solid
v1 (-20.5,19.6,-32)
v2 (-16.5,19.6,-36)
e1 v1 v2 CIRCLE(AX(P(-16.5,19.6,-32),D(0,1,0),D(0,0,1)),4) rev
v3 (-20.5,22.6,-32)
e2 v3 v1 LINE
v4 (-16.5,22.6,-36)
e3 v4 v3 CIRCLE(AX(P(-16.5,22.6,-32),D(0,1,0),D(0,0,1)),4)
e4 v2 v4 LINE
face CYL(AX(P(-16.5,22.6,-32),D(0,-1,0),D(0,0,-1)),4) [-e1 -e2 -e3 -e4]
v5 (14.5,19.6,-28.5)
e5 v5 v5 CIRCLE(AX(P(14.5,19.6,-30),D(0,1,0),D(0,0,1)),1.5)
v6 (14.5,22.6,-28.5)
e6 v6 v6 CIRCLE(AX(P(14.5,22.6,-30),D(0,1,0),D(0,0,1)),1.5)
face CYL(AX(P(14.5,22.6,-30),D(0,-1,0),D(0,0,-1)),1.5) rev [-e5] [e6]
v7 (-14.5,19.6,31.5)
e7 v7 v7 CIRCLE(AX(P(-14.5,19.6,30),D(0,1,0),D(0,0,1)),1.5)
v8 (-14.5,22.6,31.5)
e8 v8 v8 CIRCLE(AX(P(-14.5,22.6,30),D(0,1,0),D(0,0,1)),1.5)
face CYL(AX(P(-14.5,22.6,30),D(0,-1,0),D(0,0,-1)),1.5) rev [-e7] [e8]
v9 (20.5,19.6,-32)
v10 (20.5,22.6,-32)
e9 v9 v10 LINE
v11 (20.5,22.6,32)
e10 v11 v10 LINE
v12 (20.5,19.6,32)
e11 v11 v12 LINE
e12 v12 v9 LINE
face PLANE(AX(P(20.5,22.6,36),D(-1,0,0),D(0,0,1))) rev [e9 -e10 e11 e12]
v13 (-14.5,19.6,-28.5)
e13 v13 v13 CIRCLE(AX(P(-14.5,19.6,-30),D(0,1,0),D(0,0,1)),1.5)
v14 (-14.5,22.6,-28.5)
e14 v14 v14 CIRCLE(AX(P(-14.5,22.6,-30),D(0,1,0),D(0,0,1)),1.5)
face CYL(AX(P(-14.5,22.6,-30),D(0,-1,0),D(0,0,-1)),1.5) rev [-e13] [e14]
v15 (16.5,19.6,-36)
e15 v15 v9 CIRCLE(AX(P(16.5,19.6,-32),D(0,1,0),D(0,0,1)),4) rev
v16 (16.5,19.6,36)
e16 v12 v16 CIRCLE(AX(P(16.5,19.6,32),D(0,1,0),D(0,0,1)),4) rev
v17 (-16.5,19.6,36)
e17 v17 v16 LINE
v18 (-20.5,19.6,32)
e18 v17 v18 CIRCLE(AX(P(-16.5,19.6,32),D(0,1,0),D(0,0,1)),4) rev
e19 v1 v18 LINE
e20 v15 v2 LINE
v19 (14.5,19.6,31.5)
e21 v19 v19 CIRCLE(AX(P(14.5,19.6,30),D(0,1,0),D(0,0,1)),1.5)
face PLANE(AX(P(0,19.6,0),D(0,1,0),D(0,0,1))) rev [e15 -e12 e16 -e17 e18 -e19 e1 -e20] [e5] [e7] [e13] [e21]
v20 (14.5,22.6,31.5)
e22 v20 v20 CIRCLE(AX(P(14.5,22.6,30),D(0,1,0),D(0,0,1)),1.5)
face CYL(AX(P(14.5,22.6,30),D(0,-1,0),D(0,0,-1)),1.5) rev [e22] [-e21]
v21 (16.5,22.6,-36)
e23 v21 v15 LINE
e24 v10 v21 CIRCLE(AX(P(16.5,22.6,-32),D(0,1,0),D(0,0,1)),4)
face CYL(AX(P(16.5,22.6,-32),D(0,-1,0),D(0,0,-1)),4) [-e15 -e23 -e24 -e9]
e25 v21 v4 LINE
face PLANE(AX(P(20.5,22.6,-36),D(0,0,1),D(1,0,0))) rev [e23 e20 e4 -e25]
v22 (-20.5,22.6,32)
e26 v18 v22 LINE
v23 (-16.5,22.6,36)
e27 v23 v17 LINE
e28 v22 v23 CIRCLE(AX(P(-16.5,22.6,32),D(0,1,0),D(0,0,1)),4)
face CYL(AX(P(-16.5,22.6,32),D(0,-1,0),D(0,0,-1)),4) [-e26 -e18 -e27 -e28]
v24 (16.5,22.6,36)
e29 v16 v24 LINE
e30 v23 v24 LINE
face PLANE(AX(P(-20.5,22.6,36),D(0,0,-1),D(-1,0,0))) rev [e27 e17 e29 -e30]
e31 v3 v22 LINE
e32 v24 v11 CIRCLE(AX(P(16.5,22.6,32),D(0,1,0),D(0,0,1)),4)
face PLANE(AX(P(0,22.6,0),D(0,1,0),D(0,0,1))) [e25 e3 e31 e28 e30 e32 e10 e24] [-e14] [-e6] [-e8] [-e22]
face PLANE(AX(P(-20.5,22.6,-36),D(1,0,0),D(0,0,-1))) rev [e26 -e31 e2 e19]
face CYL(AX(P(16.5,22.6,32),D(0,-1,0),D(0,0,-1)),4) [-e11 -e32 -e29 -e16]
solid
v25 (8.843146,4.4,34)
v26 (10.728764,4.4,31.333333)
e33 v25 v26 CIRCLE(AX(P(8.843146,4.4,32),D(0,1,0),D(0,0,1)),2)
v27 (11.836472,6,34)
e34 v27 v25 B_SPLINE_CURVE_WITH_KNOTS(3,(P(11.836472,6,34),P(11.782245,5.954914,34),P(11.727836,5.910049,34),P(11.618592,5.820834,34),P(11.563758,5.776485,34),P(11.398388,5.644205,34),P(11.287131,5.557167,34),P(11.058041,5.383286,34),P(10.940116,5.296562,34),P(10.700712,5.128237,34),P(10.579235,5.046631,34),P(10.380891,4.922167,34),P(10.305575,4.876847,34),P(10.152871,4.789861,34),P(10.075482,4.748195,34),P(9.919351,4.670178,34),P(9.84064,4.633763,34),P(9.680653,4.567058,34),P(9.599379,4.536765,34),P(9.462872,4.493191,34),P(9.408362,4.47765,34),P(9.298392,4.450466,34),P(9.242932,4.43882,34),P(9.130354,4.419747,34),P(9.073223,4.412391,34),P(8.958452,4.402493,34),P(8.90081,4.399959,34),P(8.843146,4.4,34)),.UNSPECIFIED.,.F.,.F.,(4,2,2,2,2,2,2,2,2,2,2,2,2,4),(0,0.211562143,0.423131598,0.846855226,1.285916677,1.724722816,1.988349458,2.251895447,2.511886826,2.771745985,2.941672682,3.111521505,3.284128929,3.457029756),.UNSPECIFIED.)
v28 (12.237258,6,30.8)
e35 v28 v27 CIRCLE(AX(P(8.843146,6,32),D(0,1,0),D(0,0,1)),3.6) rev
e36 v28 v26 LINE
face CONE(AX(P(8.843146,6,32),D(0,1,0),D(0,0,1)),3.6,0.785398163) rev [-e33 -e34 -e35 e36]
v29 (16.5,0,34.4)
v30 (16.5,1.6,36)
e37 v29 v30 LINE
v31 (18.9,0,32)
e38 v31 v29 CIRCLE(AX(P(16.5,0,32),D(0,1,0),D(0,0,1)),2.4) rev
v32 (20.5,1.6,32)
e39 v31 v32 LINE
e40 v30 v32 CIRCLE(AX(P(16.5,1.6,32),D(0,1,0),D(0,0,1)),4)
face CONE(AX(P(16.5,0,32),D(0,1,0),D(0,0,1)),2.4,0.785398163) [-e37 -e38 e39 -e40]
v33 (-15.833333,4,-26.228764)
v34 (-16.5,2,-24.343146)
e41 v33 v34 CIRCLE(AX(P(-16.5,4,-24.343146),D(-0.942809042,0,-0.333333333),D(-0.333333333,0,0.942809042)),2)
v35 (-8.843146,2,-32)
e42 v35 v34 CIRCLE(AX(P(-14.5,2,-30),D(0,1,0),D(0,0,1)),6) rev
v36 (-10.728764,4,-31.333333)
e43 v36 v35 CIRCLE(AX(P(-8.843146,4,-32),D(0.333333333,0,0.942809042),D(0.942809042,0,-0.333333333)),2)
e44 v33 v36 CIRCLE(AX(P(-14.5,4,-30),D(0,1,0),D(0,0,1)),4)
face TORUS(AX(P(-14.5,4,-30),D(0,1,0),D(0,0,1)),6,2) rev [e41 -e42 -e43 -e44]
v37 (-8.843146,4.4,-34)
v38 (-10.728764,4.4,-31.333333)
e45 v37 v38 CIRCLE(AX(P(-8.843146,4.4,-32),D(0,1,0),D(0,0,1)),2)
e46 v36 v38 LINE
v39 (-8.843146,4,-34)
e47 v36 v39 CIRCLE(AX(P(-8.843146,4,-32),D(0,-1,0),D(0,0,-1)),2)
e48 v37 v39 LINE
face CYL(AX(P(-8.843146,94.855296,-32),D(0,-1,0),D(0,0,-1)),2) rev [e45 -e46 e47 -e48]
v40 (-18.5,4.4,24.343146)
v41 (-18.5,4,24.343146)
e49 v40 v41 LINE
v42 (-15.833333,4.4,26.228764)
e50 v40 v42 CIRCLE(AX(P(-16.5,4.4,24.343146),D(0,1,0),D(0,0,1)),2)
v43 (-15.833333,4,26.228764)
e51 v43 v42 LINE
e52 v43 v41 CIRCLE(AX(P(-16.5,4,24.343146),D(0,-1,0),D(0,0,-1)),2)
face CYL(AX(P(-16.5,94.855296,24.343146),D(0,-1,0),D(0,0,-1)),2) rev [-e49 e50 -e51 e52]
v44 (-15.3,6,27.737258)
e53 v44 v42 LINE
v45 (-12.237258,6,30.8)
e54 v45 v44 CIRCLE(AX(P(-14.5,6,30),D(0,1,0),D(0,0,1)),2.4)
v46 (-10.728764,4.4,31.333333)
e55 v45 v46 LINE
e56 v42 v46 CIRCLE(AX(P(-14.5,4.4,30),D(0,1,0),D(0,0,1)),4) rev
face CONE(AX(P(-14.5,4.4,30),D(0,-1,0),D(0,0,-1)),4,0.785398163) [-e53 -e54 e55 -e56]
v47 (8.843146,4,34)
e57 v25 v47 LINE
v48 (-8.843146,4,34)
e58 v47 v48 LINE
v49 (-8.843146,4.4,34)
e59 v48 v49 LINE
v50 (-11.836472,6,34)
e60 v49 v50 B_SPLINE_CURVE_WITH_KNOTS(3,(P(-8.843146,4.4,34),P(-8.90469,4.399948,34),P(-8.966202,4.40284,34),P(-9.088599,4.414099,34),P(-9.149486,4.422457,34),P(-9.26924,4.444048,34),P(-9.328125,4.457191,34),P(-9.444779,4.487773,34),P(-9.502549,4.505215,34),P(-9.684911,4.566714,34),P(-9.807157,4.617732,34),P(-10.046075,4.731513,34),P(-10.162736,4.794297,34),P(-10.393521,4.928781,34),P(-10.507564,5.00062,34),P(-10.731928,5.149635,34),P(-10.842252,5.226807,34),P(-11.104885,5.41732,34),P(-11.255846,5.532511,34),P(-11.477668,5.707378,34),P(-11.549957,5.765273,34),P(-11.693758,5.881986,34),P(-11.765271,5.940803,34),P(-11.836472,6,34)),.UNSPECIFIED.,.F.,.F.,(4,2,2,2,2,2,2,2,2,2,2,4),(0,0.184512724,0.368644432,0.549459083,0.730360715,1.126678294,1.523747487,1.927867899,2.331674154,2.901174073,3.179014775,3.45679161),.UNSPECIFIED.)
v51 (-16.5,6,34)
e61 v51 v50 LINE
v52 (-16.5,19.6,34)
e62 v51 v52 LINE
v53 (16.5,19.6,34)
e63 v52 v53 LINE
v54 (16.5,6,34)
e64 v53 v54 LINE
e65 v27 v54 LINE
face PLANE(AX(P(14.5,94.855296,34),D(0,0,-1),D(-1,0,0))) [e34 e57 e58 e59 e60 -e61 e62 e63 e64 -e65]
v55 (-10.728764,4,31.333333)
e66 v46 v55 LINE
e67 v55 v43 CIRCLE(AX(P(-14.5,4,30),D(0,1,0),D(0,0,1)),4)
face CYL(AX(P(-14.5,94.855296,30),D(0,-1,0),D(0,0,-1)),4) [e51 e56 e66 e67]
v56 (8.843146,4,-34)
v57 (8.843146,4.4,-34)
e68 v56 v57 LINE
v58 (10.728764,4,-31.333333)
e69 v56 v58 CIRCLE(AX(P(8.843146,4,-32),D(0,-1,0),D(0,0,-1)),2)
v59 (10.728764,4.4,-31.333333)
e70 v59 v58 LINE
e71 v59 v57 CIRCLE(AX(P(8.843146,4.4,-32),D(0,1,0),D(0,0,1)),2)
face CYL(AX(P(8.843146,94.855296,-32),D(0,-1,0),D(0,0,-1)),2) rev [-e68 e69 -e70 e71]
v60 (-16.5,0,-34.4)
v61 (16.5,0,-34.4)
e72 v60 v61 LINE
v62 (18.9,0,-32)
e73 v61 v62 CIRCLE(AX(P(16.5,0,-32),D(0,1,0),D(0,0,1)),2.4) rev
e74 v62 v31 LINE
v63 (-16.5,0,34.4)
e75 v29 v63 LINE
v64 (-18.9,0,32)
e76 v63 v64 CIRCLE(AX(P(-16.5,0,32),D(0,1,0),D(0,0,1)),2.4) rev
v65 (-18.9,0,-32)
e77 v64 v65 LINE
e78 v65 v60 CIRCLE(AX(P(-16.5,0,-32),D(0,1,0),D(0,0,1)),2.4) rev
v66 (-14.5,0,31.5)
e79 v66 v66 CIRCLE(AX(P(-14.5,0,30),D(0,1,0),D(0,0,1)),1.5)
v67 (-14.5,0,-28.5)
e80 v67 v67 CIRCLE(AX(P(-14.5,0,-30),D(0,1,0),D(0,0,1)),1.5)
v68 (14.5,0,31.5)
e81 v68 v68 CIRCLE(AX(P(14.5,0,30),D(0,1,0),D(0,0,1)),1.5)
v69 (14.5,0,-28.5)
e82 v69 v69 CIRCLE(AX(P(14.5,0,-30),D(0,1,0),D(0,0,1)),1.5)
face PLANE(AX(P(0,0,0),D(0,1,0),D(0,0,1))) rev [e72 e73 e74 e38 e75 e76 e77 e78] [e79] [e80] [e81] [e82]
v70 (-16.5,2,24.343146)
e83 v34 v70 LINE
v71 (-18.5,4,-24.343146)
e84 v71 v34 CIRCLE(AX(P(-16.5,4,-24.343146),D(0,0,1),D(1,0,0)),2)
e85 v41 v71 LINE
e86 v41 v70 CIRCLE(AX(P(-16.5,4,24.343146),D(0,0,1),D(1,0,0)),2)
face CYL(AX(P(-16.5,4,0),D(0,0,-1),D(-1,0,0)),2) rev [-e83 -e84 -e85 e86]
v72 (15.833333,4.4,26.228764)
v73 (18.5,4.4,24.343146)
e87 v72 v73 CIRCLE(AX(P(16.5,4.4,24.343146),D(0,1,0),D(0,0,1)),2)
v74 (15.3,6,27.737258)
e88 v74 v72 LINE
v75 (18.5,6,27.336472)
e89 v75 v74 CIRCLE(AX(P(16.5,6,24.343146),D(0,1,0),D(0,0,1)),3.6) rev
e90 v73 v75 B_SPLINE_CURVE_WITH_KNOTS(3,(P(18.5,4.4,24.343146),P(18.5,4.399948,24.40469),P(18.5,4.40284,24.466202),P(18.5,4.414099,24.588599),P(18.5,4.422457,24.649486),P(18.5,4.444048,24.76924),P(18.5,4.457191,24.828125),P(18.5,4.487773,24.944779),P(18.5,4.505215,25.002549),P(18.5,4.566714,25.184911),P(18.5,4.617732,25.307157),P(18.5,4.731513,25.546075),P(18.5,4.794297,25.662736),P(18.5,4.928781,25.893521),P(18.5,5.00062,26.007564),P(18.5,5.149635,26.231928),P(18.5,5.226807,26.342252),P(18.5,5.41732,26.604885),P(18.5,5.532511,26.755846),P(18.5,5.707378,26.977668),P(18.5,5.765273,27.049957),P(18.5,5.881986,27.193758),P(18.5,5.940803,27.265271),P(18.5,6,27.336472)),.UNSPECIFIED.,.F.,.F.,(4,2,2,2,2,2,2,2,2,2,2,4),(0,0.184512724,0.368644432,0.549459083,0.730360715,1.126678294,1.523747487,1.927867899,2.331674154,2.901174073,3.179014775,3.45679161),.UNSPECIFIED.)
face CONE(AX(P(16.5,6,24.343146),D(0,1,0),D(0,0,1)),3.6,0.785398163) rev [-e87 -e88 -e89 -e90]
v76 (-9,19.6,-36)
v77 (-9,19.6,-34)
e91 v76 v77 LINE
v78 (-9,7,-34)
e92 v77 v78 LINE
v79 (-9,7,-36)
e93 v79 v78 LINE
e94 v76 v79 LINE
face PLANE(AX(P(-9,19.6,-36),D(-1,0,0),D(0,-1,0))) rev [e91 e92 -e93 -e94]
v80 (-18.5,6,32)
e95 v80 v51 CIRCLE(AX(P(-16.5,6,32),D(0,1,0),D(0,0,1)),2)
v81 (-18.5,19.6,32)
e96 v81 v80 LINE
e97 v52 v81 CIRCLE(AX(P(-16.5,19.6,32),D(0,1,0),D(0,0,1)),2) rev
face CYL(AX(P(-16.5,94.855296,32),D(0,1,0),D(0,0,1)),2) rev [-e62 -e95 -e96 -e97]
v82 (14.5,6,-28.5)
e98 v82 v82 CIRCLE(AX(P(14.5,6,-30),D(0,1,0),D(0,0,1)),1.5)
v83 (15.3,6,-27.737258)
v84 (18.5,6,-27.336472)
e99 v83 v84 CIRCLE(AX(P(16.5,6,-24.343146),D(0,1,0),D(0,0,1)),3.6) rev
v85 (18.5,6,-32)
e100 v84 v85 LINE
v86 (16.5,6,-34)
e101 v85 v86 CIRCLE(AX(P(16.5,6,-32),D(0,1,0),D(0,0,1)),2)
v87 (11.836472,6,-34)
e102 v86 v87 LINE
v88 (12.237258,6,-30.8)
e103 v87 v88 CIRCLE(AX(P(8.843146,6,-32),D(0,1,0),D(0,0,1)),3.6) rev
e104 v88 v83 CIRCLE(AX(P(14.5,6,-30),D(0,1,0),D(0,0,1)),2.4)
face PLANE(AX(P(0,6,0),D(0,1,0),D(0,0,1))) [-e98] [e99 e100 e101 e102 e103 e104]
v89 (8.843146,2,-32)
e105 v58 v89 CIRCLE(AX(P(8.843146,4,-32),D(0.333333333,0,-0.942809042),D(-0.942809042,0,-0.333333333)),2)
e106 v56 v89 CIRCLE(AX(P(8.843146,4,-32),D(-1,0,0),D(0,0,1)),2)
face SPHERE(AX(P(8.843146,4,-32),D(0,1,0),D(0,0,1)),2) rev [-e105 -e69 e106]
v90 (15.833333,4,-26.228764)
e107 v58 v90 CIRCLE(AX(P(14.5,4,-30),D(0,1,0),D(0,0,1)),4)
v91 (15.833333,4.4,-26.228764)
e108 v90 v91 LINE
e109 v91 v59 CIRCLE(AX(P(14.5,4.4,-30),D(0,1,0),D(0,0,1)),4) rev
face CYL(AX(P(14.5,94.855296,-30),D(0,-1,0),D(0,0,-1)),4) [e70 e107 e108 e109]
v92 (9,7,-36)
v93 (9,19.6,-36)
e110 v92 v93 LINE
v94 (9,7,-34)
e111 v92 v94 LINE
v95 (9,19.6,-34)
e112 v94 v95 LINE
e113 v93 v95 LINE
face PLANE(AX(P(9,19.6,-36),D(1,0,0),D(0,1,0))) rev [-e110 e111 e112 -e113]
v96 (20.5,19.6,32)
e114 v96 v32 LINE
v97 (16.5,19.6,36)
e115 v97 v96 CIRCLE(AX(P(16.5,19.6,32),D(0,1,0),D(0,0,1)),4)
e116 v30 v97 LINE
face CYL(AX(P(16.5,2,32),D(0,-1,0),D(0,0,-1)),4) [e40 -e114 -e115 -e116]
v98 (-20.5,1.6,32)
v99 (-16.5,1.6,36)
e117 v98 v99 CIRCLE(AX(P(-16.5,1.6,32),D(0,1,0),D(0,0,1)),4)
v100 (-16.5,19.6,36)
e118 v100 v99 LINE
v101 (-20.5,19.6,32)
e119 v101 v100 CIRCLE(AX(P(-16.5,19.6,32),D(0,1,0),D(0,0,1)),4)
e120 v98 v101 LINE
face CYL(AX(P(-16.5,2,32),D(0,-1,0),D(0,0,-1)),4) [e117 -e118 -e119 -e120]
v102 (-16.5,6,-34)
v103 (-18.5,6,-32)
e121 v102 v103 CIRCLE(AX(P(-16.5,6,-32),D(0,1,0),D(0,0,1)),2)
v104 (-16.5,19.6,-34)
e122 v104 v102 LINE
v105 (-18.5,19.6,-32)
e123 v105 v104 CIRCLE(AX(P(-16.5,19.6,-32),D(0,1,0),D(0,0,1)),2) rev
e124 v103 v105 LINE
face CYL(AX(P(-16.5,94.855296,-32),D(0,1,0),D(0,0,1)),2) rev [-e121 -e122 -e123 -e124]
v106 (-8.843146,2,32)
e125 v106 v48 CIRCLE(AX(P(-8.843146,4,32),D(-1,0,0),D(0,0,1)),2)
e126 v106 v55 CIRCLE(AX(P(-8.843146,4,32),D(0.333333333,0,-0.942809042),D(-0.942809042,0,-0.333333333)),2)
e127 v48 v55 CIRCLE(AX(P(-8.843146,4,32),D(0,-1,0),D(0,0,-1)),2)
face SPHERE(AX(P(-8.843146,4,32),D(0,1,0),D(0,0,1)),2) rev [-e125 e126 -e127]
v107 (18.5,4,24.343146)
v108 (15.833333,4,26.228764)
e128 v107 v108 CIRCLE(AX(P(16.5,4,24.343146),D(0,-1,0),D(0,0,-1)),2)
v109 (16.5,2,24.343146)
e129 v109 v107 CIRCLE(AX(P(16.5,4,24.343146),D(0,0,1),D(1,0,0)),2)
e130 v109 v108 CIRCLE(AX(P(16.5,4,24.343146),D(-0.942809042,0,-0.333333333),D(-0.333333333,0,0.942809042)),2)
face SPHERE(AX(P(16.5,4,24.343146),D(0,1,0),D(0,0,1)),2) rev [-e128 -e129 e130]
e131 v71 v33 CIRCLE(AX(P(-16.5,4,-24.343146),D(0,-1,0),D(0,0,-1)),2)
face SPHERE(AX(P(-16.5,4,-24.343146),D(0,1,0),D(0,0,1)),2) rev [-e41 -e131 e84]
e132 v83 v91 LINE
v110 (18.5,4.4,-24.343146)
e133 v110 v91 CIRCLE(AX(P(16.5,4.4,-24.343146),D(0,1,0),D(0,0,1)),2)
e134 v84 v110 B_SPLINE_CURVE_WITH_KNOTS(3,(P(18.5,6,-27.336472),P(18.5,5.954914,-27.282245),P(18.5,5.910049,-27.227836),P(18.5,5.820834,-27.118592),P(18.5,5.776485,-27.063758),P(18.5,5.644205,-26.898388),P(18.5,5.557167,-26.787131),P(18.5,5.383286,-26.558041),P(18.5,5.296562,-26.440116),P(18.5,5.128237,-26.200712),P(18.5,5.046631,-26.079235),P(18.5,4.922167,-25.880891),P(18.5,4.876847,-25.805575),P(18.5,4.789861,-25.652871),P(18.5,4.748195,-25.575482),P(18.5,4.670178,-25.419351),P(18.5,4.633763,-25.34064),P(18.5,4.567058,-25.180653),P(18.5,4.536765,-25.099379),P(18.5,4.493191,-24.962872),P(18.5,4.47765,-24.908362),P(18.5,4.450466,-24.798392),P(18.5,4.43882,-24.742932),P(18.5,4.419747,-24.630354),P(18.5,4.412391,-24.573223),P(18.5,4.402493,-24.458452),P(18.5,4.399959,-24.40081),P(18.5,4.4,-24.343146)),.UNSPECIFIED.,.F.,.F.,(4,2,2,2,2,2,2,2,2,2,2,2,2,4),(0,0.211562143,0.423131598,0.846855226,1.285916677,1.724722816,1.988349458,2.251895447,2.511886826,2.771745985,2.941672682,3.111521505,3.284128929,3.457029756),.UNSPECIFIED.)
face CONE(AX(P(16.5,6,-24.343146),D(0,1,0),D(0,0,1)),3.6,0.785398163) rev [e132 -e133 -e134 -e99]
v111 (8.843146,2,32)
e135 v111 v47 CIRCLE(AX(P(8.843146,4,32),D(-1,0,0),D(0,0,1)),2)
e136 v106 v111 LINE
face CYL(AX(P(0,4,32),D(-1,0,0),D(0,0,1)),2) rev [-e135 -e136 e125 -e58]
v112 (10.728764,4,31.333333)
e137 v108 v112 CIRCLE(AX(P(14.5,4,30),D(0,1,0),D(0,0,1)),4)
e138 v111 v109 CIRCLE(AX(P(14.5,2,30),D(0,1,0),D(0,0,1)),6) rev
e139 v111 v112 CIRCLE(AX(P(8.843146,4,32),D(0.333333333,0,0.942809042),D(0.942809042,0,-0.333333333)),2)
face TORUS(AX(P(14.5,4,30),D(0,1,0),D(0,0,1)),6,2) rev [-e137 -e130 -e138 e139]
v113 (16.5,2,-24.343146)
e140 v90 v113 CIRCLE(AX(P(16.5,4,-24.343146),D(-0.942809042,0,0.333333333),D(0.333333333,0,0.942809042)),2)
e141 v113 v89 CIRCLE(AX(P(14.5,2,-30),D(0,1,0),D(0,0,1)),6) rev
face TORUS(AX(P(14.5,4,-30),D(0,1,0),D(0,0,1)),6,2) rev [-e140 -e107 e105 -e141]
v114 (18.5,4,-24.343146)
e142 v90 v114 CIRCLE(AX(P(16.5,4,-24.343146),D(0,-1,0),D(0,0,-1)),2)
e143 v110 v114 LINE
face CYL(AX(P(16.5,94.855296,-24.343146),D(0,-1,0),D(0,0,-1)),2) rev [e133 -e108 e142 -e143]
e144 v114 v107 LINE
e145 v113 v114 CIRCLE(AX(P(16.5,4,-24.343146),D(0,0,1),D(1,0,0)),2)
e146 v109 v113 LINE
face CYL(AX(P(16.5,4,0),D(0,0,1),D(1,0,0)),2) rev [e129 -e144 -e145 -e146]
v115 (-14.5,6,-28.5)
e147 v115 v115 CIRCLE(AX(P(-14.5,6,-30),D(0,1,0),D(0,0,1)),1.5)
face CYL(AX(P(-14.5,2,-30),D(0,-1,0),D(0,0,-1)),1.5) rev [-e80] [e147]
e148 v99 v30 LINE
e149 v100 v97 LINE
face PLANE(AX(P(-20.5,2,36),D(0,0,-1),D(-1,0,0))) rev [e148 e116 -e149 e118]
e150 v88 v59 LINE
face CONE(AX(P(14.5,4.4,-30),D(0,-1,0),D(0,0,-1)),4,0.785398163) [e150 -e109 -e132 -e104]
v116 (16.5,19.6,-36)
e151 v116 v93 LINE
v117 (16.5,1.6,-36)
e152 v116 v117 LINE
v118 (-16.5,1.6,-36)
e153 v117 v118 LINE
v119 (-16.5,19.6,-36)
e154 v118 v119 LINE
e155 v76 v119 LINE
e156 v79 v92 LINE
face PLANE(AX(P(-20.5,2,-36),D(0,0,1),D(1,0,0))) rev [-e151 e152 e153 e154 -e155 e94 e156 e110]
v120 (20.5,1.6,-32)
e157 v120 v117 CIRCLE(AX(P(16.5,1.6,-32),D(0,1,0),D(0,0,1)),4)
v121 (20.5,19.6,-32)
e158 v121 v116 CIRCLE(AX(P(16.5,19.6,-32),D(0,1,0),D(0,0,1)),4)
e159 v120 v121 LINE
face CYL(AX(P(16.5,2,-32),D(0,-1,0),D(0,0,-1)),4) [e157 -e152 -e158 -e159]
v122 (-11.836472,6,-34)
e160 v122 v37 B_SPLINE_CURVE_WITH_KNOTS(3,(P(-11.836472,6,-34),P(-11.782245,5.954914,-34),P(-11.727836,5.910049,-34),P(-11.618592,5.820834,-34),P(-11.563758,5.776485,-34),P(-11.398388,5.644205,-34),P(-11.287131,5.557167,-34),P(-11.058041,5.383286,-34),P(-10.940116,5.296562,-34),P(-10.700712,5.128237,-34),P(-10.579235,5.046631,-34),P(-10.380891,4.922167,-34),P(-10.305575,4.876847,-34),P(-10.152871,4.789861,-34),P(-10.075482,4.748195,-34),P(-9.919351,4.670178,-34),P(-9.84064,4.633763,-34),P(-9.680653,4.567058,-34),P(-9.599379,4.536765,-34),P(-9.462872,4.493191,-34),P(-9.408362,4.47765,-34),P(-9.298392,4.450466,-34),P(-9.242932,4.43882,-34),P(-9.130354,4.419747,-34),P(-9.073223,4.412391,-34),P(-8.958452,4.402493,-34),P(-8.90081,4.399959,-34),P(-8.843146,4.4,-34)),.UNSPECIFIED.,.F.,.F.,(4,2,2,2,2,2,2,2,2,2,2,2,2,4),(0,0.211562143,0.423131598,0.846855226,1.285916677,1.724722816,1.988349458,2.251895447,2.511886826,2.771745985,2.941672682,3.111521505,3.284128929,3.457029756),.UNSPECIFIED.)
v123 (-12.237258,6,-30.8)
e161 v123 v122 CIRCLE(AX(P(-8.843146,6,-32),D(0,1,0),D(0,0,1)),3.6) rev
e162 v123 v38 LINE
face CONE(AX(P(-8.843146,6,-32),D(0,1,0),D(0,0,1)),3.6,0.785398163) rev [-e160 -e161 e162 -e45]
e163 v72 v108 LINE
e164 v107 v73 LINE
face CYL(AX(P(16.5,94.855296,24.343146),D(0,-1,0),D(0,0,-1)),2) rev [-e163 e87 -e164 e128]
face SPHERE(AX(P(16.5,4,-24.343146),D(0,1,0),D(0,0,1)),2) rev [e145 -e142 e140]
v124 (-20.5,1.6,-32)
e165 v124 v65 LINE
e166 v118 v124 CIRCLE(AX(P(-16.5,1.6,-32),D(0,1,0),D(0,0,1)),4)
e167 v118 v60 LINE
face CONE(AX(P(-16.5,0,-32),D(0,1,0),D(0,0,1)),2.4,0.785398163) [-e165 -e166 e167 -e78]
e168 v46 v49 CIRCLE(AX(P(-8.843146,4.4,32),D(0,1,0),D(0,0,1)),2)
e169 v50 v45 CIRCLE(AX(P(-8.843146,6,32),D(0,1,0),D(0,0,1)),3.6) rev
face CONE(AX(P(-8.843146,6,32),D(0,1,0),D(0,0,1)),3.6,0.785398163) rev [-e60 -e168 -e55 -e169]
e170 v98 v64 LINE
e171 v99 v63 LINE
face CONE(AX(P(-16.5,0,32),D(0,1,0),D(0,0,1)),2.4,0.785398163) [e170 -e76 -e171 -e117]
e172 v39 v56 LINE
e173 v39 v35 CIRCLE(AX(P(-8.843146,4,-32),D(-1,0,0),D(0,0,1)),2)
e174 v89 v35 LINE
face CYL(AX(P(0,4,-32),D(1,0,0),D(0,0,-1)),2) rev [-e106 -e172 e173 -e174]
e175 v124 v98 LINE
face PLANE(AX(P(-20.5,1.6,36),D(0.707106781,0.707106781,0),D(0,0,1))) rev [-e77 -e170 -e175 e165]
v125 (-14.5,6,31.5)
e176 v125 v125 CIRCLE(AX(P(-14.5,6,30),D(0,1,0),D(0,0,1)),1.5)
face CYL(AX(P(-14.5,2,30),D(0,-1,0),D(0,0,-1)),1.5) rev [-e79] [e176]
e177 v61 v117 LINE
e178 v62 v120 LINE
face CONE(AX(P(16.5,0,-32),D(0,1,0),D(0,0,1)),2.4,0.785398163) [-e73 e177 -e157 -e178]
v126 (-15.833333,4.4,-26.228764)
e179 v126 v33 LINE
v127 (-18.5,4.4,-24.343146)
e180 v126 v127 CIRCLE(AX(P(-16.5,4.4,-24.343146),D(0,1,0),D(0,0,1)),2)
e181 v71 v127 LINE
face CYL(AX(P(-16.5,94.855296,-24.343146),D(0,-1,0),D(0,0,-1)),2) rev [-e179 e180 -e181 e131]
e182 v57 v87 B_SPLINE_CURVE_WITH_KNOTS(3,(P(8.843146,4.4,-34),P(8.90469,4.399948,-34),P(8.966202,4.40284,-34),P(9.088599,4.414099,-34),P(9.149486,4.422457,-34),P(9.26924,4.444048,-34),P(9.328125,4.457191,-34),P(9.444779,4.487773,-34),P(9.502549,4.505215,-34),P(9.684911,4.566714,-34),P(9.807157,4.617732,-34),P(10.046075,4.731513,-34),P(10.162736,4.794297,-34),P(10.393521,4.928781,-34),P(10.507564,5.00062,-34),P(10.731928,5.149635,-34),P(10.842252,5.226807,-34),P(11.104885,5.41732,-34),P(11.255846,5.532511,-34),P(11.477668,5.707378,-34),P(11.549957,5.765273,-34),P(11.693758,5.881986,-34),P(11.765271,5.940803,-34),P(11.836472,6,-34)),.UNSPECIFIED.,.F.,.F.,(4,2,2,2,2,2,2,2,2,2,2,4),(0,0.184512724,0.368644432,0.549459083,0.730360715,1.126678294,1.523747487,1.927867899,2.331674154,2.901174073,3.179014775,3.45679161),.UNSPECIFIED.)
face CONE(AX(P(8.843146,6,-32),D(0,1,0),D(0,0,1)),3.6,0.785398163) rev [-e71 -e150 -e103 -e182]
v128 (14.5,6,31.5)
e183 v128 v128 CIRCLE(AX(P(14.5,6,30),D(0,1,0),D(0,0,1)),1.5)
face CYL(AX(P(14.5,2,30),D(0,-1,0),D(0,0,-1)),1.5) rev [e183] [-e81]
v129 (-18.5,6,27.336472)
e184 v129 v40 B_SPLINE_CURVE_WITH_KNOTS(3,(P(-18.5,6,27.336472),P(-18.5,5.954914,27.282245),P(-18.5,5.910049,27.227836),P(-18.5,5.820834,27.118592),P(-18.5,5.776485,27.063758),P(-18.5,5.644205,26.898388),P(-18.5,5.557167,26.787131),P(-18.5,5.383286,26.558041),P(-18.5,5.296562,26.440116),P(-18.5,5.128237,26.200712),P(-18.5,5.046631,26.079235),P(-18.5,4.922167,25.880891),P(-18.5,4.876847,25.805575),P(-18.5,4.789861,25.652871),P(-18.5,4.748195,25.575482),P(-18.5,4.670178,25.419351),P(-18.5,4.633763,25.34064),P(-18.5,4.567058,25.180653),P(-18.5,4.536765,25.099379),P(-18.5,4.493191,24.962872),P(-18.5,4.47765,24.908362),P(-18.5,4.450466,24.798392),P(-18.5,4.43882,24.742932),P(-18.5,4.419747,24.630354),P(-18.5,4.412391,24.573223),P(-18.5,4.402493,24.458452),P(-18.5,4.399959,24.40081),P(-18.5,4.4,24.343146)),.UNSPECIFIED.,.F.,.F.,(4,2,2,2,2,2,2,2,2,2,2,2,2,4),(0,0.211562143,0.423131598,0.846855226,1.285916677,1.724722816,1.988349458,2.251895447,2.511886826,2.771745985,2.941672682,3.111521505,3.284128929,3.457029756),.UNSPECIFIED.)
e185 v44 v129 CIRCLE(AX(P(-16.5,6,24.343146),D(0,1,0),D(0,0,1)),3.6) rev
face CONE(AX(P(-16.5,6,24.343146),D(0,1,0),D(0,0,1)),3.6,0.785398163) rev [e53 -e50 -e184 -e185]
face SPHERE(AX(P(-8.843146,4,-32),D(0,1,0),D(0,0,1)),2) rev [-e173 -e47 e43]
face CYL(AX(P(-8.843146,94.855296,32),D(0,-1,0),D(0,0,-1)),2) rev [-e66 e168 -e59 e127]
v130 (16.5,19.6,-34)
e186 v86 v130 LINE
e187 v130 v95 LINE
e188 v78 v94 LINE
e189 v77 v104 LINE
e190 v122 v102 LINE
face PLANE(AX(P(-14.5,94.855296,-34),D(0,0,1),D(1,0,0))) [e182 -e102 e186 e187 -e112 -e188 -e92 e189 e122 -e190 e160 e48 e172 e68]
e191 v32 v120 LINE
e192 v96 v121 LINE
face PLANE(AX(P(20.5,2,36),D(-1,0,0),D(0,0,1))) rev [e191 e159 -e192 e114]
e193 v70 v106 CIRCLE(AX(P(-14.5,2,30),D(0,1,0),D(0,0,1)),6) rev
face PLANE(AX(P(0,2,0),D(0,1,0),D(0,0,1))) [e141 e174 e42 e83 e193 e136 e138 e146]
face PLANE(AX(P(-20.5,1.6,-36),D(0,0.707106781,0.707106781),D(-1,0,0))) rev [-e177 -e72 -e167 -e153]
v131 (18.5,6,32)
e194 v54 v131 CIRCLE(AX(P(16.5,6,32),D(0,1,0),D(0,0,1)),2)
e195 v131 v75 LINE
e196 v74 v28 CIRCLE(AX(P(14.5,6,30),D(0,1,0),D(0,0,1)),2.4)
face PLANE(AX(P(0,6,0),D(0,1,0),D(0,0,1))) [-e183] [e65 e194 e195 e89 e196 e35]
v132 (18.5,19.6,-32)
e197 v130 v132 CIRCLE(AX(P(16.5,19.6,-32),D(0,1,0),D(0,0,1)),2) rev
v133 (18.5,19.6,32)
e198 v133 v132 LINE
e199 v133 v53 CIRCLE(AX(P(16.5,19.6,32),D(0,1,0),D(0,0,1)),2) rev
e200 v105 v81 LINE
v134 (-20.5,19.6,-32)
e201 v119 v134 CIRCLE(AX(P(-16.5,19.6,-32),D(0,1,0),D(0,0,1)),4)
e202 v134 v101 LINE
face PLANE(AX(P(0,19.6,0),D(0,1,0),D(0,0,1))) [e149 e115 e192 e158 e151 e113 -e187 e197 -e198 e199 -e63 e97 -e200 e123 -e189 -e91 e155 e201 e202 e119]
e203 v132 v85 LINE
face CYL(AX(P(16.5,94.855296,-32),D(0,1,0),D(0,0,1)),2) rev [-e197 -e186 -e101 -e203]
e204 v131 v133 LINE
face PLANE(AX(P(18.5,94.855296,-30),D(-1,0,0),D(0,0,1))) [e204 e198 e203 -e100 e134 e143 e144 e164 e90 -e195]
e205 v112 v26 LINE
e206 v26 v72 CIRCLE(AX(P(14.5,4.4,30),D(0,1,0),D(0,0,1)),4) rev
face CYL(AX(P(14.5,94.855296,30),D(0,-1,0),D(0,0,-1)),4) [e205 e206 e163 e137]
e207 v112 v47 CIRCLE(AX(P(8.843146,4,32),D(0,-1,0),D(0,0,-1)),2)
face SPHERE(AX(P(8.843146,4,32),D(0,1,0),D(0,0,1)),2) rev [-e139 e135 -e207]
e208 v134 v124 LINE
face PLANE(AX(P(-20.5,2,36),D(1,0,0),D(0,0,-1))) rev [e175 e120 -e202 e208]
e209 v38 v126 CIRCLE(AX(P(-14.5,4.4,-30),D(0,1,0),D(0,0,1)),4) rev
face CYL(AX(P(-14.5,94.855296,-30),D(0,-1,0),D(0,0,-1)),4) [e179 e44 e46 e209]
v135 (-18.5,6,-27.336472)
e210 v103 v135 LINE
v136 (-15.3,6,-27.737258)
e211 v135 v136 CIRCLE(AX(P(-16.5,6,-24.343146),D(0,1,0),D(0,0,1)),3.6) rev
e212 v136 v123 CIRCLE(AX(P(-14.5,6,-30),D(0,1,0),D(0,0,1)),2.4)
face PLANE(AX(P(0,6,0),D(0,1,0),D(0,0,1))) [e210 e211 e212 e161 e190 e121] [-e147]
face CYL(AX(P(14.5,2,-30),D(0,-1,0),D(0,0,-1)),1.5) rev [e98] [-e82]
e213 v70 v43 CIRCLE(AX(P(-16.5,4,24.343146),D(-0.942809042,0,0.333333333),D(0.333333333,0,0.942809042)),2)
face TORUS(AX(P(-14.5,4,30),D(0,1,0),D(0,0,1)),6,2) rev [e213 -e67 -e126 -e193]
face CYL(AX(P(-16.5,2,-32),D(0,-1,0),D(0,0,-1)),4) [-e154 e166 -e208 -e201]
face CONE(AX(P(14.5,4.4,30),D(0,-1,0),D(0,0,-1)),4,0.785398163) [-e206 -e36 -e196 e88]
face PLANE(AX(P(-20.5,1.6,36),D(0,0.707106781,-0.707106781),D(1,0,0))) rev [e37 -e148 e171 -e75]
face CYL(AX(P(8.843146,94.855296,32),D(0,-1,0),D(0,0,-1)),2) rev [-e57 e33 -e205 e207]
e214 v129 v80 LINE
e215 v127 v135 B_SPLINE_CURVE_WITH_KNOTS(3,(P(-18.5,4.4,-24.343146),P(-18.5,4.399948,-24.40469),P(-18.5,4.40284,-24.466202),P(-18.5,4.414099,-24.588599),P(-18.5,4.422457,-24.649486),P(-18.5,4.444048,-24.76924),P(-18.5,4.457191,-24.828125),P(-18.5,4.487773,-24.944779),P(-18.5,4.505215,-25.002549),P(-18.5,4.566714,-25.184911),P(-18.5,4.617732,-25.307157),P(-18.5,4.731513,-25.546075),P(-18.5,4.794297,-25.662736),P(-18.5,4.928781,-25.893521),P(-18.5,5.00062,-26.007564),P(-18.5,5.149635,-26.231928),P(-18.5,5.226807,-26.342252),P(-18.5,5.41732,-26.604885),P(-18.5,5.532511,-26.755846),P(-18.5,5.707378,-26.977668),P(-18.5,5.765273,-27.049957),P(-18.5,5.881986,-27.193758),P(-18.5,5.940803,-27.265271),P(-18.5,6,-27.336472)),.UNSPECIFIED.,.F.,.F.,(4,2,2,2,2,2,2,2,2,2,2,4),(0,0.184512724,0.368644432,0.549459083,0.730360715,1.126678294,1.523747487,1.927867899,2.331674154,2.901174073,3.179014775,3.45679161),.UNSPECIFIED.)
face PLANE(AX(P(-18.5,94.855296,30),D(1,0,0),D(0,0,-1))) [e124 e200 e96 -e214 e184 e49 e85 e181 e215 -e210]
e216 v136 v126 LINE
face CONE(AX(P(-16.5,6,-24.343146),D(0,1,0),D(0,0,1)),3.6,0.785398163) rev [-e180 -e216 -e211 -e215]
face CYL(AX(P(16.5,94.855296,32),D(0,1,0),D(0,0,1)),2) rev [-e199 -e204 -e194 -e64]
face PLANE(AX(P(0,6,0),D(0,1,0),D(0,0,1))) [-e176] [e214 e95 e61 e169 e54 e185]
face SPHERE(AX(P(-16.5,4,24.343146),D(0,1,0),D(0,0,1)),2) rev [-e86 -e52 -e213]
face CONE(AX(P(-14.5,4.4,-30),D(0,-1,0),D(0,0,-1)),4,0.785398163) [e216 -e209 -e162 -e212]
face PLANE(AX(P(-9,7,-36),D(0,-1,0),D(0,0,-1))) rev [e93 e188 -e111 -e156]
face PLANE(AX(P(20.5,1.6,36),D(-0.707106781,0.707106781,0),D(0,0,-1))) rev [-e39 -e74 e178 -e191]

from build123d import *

# Parameters (mm, degrees)
SKETCH1_W           = 41
SKETCH1_H           = 72
SKETCH1_R           = 1.5
BOSS_EXTRUDE1_DEPTH = 2
SKETCH2_W           = 41
SKETCH2_H           = 72
SKETCH2_R           = 1.5
BOSS_EXTRUDE2_DEPTH = 4
SKETCH4_W           = 41
SKETCH4_H           = 72
SKETCH4_W_2         = 37
SKETCH4_H_2         = 68
BOSS_EXTRUDE3_DEPTH = 13.6
FILLET1_START       = 1
FILLET1_DEPTH       = 5
CHAMFER1_SIZE       = 1.6
SKETCH5_W           = 18
SKETCH5_H           = 12.6
CUT_EXTRUDE1_DEPTH  = 76.527544644
SKETCH6_W           = 41
SKETCH6_H           = 72
SKETCH6_R           = 1.5
BOSS_EXTRUDE4_DEPTH = 3
FILLET3_R           = 2
FILLET4_R           = 2
FILLET5_R           = 4
FILLET6_R           = 4
CHAMFER2_SIZE       = 1.6


with BuildPart() as part:
    # Sketch1 → Boss-Extrude1 (new body)
    with BuildSketch(Plane(origin=(0, 0, 0), x_dir=(1, 0, 0), z_dir=(0, 1, 0))):
        Rectangle(SKETCH1_W, SKETCH1_H)
        with Locations(Location((-14.5, 30, 0), (0, 0, 270))):
            Circle(SKETCH1_R, mode=Mode.SUBTRACT)
        with Locations(Location((14.5, 30, 0), (0, 0, 270))):
            Circle(SKETCH1_R, mode=Mode.SUBTRACT)
        with Locations(Location((14.5, -30, 0), (0, 0, 270))):
            Circle(SKETCH1_R, mode=Mode.SUBTRACT)
        with Locations(Location((-14.5, -30, 0), (0, 0, 270))):
            Circle(SKETCH1_R, mode=Mode.SUBTRACT)
    extrude(amount=BOSS_EXTRUDE1_DEPTH)

    # Sketch2 → Boss-Extrude2 (add)
    with BuildSketch(Plane(origin=(0, 2, 0), x_dir=(1, 0, 0), z_dir=(0, 1, 0))):
        Rectangle(SKETCH2_W, SKETCH2_H)
        with Locations(Location((14.5, -30, 0), (0, 0, 270))):
            Circle(SKETCH2_R, mode=Mode.SUBTRACT)
        with Locations(Location((14.5, 30, 0), (0, 0, 270))):
            Circle(SKETCH2_R, mode=Mode.SUBTRACT)
        with Locations(Location((-14.5, 30, 0), (0, 0, 270))):
            Circle(SKETCH2_R, mode=Mode.SUBTRACT)
        with Locations(Location((-14.5, -30, 0), (0, 0, 270))):
            Circle(SKETCH2_R, mode=Mode.SUBTRACT)
        with BuildLine():
            Line((-14.5, 34), (14.5, 34))
            ThreePointArc((14.5, 34), (11.671572875, 27.171572875), (18.5, 30))
            Line((18.5, 30), (18.5, -30))
            ThreePointArc((18.5, -30), (11.671572875, -27.171572875), (14.5, -34))
            Line((14.5, -34), (-14.5, -34))
            ThreePointArc((-14.5, -34), (-11.671572875, -27.171572875), (-18.5, -30))
            Line((-18.5, -30), (-18.5, 30))
            ThreePointArc((-18.5, 30), (-11.671572875, 27.171572875), (-14.5, 34))
        make_face(mode=Mode.SUBTRACT)
    extrude(amount=BOSS_EXTRUDE2_DEPTH)

    # Sketch4 → Boss-Extrude3 (add)
    with BuildSketch(Plane(origin=(0, 6, 0), x_dir=(1, 0, 0), z_dir=(0, 1, 0))):
        Rectangle(SKETCH4_W, SKETCH4_H)
        Rectangle(SKETCH4_W_2, SKETCH4_H_2, mode=Mode.SUBTRACT)
    extrude(amount=BOSS_EXTRUDE3_DEPTH)

    # Fillet1: read off the stored shape, not the designer's step
    # Fillet1 outline → Fillet1 (add)
    with BuildSketch(Plane(origin=(0, 0, 0), x_dir=(1, 0, 0), z_dir=(0, 1, 0)).offset(FILLET1_START)):
        with BuildLine():
            Line((-14.5, -34), (-8.843145751, -34))
            ThreePointArc((-8.843145751, -34), (-10.476138912, -33.154700538), (-10.728763834, -31.333333333))
            ThreePointArc((-10.728763834, -31.333333333), (-12.190598923, -33.265986324), (-14.5, -34))
        make_face()
        with BuildLine():
            ThreePointArc((10.728763834, -31.333333333), (10.476138912, -33.154700538), (8.843145751, -34))
            Line((8.843145751, -34), (14.5, -34))
            ThreePointArc((14.5, -34), (12.190598923, -33.265986324), (10.728763834, -31.333333333))
        make_face()
        with BuildLine():
            ThreePointArc((-18.5, -30), (-17.765986324, -27.690598923), (-15.833333333, -26.228763833))
            ThreePointArc((-15.833333333, -26.228763833), (-17.654700538, -25.976138912), (-18.5, -24.343145751))
            Line((-18.5, -24.343145751), (-18.5, -30))
        make_face()
        with BuildLine():
            ThreePointArc((18.5, -24.343145751), (17.654700538, -25.976138912), (15.833333333, -26.228763834))
            ThreePointArc((15.833333333, -26.228763834), (17.765986324, -27.690598923), (18.5, -30))
            Line((18.5, -30), (18.5, -24.343145751))
        make_face()
        with BuildLine():
            Line((-18.5, 30), (-18.5, 24.343145751))
            ThreePointArc((-18.5, 24.343145751), (-17.654700538, 25.976138912), (-15.833333333, 26.228763834))
            ThreePointArc((-15.833333333, 26.228763834), (-17.765986324, 27.690598923), (-18.5, 30))
        make_face()
        with BuildLine():
            ThreePointArc((15.833333333, 26.228763834), (17.654700538, 25.976138912), (18.5, 24.343145751))
            Line((18.5, 24.343145751), (18.5, 30))
            ThreePointArc((18.5, 30), (17.765986324, 27.690598923), (15.833333333, 26.228763834))
        make_face()
        with BuildLine():
            ThreePointArc((-14.5, 34), (-12.190598923, 33.265986324), (-10.728763833, 31.333333333))
            ThreePointArc((-10.728763833, 31.333333333), (-10.476138912, 33.154700538), (-8.843145751, 34))
            Line((-8.843145751, 34), (-14.5, 34))
        make_face()
        with BuildLine():
            ThreePointArc((8.843145751, 34), (10.476138912, 33.154700538), (10.728763834, 31.333333333))
            ThreePointArc((10.728763834, 31.333333333), (12.190598923, 33.265986324), (14.5, 34))
            Line((14.5, 34), (8.843145751, 34))
        make_face()
    extrude(amount=FILLET1_DEPTH)

    # Chamfer1
    # the kernel refuses this chamfer: 1.6 mm, written as the material it takes off along each edge
    with BuildSketch(Plane(origin=(14.5, 6, 30), x_dir=(0.33333333328504766, 0, -0.9428090415991349), z_dir=(0.9428090415991349, 0, 0.33333333328504766))) as chamfer1_piece_1:
        Polygon((4 - CHAMFER1_SIZE, 0), (4, -CHAMFER1_SIZE), (4, 0), align=None)
    revolve(axis=Axis((14.5, 6, 30), (0, 1, 0)), revolution_arc=128.942441263, mode=Mode.SUBTRACT)
    with BuildSketch(Plane(origin=(14.5, 6, -30), x_dir=(-0.9428090415991346, 0, -0.33333333328504894), z_dir=(0.33333333328504894, 0, -0.9428090415991346))) as chamfer1_piece_2:
        Polygon((4 - CHAMFER1_SIZE, 0), (4, -CHAMFER1_SIZE), (4, 0), align=None)
    revolve(axis=Axis((14.5, 6, -30), (0, 1, 0)), revolution_arc=128.942441263, mode=Mode.SUBTRACT)
    with BuildSketch(Plane(origin=(-14.5, 6, -30), x_dir=(-0.33333333328504905, 0, 0.9428090415991345), z_dir=(-0.9428090415991345, 0, -0.33333333328504905))) as chamfer1_piece_3:
        Polygon((4, -CHAMFER1_SIZE), (4 - CHAMFER1_SIZE, 0), (4, 0), align=None)
    revolve(axis=Axis((-14.5, 6, -30), (0, 1, 0)), revolution_arc=128.942441258, mode=Mode.SUBTRACT)
    with BuildSketch(Plane(origin=(-8.843145749, 6, 31.999999999), x_dir=(0.8833787709111521, 0, -0.4686597348860923), z_dir=(-0.4686597348860923, 0, -0.8833787709111521))) as chamfer1_piece_4_section:
        Polygon((2.000000001 + CHAMFER1_SIZE, 0), (2.000000001, CHAMFER1_SIZE), (2.000000001, 0), align=None)
    chamfer1_piece_4 = revolve(axis=Axis((-8.843145749, 6, 31.999999999), (0, -1, 0)), revolution_arc=227.418552742, mode=Mode.PRIVATE)
    chamfer1_piece_4 = split(chamfer1_piece_4, bisect_by=Plane(origin=(-8.843145749, 6, 34), z_dir=(0, 0, -1)), keep=Keep.TOP, mode=Mode.PRIVATE)
    add(chamfer1_piece_4, mode=Mode.SUBTRACT)
    with BuildSketch(Plane(origin=(-16.5, 6, 24.34314575), x_dir=(0.3333333334424864, 0, 0.942809041543472), z_dir=(0.942809041543472, 0, -0.3333333334424864))) as chamfer1_piece_5_section:
        Polygon((2 + CHAMFER1_SIZE, 0), (2, CHAMFER1_SIZE), (2, 0), align=None)
    chamfer1_piece_5 = revolve(axis=Axis((-16.5, 6, 24.34314575), (0, -1, 0)), revolution_arc=227.41855287, mode=Mode.PRIVATE)
    chamfer1_piece_5 = split(chamfer1_piece_5, bisect_by=Plane(origin=(-18.5, 6, 24.34314575), z_dir=(1, 0, 0)), keep=Keep.TOP, mode=Mode.PRIVATE)
    add(chamfer1_piece_5, mode=Mode.SUBTRACT)
    with BuildSketch(Plane(origin=(8.843145749, 6, 31.999999999), x_dir=(0.9428090418063638, 0, -0.3333333326989159), z_dir=(-0.3333333326989159, 0, -0.9428090418063638))) as chamfer1_piece_6_section:
        Polygon((2.000000001 + CHAMFER1_SIZE, 0), (2.000000001, CHAMFER1_SIZE), (2.000000001, 0), align=None)
    chamfer1_piece_6 = revolve(axis=Axis((8.843145749, 6, 31.999999999), (0, -1, 0)), revolution_arc=227.418552742, mode=Mode.PRIVATE)
    chamfer1_piece_6 = split(chamfer1_piece_6, bisect_by=Plane(origin=(8.843145749, 6, 34), z_dir=(0, 0, -1)), keep=Keep.TOP, mode=Mode.PRIVATE)
    add(chamfer1_piece_6, mode=Mode.SUBTRACT)
    with BuildSketch(Plane(origin=(16.499999999, 6, 24.343145749), x_dir=(-0.4686597348860955, 0, -0.8833787709111505), z_dir=(-0.8833787709111505, 0, 0.4686597348860955))) as chamfer1_piece_7_section:
        Polygon((2.000000001 + CHAMFER1_SIZE, 0), (2.000000001, CHAMFER1_SIZE), (2.000000001, 0), align=None)
    chamfer1_piece_7 = revolve(axis=Axis((16.499999999, 6, 24.343145749), (0, -1, 0)), revolution_arc=227.418552742, mode=Mode.PRIVATE)
    chamfer1_piece_7 = split(chamfer1_piece_7, bisect_by=Plane(origin=(18.5, 6, 24.343145749), z_dir=(-1, 0, 0)), keep=Keep.TOP, mode=Mode.PRIVATE)
    add(chamfer1_piece_7, mode=Mode.SUBTRACT)
    with BuildSketch(Plane(origin=(8.843145749, 6, -31.999999999), x_dir=(-0.8833787709111521, 0, 0.4686597348860923), z_dir=(0.4686597348860923, 0, 0.8833787709111521))) as chamfer1_piece_8_section:
        Polygon((2.000000001 + CHAMFER1_SIZE, 0), (2.000000001, CHAMFER1_SIZE), (2.000000001, 0), align=None)
    chamfer1_piece_8 = revolve(axis=Axis((8.843145749, 6, -31.999999999), (0, -1, 0)), revolution_arc=227.418552742, mode=Mode.PRIVATE)
    chamfer1_piece_8 = split(chamfer1_piece_8, bisect_by=Plane(origin=(8.843145749, 6, -34), z_dir=(0, 0, 1)), keep=Keep.TOP, mode=Mode.PRIVATE)
    add(chamfer1_piece_8, mode=Mode.SUBTRACT)
    with BuildSketch(Plane(origin=(16.499999999, 6, -24.343145749), x_dir=(-0.3333333326989176, 0, -0.9428090418063633), z_dir=(-0.9428090418063633, 0, 0.3333333326989176))) as chamfer1_piece_9_section:
        Polygon((2.000000001 + CHAMFER1_SIZE, 0), (2.000000001, CHAMFER1_SIZE), (2.000000001, 0), align=None)
    chamfer1_piece_9 = revolve(axis=Axis((16.499999999, 6, -24.343145749), (0, -1, 0)), revolution_arc=227.418552742, mode=Mode.PRIVATE)
    chamfer1_piece_9 = split(chamfer1_piece_9, bisect_by=Plane(origin=(18.5, 6, -24.343145749), z_dir=(-1, 0, 0)), keep=Keep.TOP, mode=Mode.PRIVATE)
    add(chamfer1_piece_9, mode=Mode.SUBTRACT)
    with BuildSketch(Plane(origin=(-8.84314575, 6, -32), x_dir=(-0.9428090415434718, 0, 0.3333333334424869), z_dir=(0.3333333334424869, 0, 0.9428090415434718))) as chamfer1_piece_10_section:
        Polygon((2 + CHAMFER1_SIZE, 0), (2, CHAMFER1_SIZE), (2, 0), align=None)
    chamfer1_piece_10 = revolve(axis=Axis((-8.84314575, 6, -32), (0, -1, 0)), revolution_arc=227.41855287, mode=Mode.PRIVATE)
    chamfer1_piece_10 = split(chamfer1_piece_10, bisect_by=Plane(origin=(-8.84314575, 6, -34), z_dir=(0, 0, 1)), keep=Keep.TOP, mode=Mode.PRIVATE)
    add(chamfer1_piece_10, mode=Mode.SUBTRACT)
    with BuildSketch(Plane(origin=(-16.499999999, 6, -24.343145749), x_dir=(0.4686597348860955, 0, 0.8833787709111505), z_dir=(0.8833787709111505, 0, -0.4686597348860955))) as chamfer1_piece_11_section:
        Polygon((2.000000001 + CHAMFER1_SIZE, 0), (2.000000001, CHAMFER1_SIZE), (2.000000001, 0), align=None)
    chamfer1_piece_11 = revolve(axis=Axis((-16.499999999, 6, -24.343145749), (0, -1, 0)), revolution_arc=227.418552742, mode=Mode.PRIVATE)
    chamfer1_piece_11 = split(chamfer1_piece_11, bisect_by=Plane(origin=(-18.5, 6, -24.343145749), z_dir=(1, 0, 0)), keep=Keep.TOP, mode=Mode.PRIVATE)
    add(chamfer1_piece_11, mode=Mode.SUBTRACT)
    with BuildSketch(Plane(origin=(-14.5, 6, 30), x_dir=(0.9428090415991349, 0, 0.33333333328504766), z_dir=(-0.33333333328504766, 0, 0.9428090415991349))) as chamfer1_piece_12:
        Polygon((4 - CHAMFER1_SIZE, 0), (4, -CHAMFER1_SIZE), (4, 0), align=None)
    revolve(axis=Axis((-14.5, 6, 30), (0, 1, 0)), revolution_arc=128.942441258, mode=Mode.SUBTRACT)

    # Sketch5 → Cut-Extrude1 (cut, through all)
    with BuildSketch(Plane.XY.offset(-34)):
        with Locations((0, 13.3)):
            Rectangle(SKETCH5_W, SKETCH5_H)
    extrude(amount=-CUT_EXTRUDE1_DEPTH, mode=Mode.SUBTRACT)

    # Fillet3
    fillet3_edges = [part.edges().sort_by_distance(p)[0] for p in [
        (-11.671572875, 2, 27.171572875),
        (0, 2, -34),
        (-11.671572875, 2, -27.171572875),
        (-18.5, 2, 0),
        (0, 2, 34),
        (11.671572875, 2, 27.171572875),
        (18.5, 2, 0),
        (11.671572875, 2, -27.171572875),
        (-17.654700538, 2, -25.976138912),
        (-10.476138912, 2, -33.154700538),
        (17.654700538, 2, -25.976138912),
        (10.476138912, 2, -33.154700538),
        (17.654700538, 2, 25.976138912),
        (10.476138912, 2, 33.154700538),
        (-17.654700538, 2, 25.976138912),
        (-10.476138912, 2, 33.154700538),
    ]]
    fillet(fillet3_edges, radius=FILLET3_R)

    # Fillet4
    fillet4_edges = [part.edges().sort_by_distance(p)[0] for p in [
        (-18.5, 12.8, -34),
        (18.5, 12.8, -34),
        (18.5, 12.8, 34),
        (-18.5, 12.8, 34),
    ]]
    fillet(fillet4_edges, radius=FILLET4_R)

    # Fillet5
    fillet5_edges = [part.edges().sort_by_distance(p)[0] for p in [
        (-20.5, 9.8, 36),
        (-20.5, 9.8, -36),
        (20.5, 9.8, -36),
        (20.5, 9.8, 36),
    ]]
    fillet(fillet5_edges, radius=FILLET5_R)

    # Chamfer2
    chamfer2_edges = [part.edges().sort_by_distance(p)[0] for p in [
        (20.5, 0, 0),
        (0, 0, 36),
        (-20.5, 0, 0),
        (0, 0, -36),
        (19.328427125, 0, -34.828427125),
        (-19.328427125, 0, -34.828427125),
        (-19.328427125, 0, 34.828427125),
        (19.328427125, 0, 34.828427125),
    ]]
    chamfer(chamfer2_edges, length=CHAMFER2_SIZE)


with BuildPart() as body_2:
    # Sketch6 → Boss-Extrude4 (new body)
    with BuildSketch(Plane(origin=(0, 19.6, 0), x_dir=(1, 0, 0), z_dir=(0, 1, 0))):
        Rectangle(SKETCH6_W, SKETCH6_H)
        with Locations(Location((-14.5, -30, 0), (0, 0, 270))):
            Circle(SKETCH6_R, mode=Mode.SUBTRACT)
        with Locations(Location((14.5, -30, 0), (0, 0, 270))):
            Circle(SKETCH6_R, mode=Mode.SUBTRACT)
        with Locations(Location((14.5, 30, 0), (0, 0, 270))):
            Circle(SKETCH6_R, mode=Mode.SUBTRACT)
        with Locations(Location((-14.5, 30, 0), (0, 0, 270))):
            Circle(SKETCH6_R, mode=Mode.SUBTRACT)
    extrude(amount=BOSS_EXTRUDE4_DEPTH)

    # Fillet6
    fillet6_edges = [body_2.edges().sort_by_distance(p)[0] for p in [
        (20.5, 21.1, 36),
        (-20.5, 21.1, 36),
        (-20.5, 21.1, -36),
        (20.5, 21.1, -36),
    ]]
    fillet(fillet6_edges, radius=FILLET6_R)


solid = Compound([part.part, body_2.part])
